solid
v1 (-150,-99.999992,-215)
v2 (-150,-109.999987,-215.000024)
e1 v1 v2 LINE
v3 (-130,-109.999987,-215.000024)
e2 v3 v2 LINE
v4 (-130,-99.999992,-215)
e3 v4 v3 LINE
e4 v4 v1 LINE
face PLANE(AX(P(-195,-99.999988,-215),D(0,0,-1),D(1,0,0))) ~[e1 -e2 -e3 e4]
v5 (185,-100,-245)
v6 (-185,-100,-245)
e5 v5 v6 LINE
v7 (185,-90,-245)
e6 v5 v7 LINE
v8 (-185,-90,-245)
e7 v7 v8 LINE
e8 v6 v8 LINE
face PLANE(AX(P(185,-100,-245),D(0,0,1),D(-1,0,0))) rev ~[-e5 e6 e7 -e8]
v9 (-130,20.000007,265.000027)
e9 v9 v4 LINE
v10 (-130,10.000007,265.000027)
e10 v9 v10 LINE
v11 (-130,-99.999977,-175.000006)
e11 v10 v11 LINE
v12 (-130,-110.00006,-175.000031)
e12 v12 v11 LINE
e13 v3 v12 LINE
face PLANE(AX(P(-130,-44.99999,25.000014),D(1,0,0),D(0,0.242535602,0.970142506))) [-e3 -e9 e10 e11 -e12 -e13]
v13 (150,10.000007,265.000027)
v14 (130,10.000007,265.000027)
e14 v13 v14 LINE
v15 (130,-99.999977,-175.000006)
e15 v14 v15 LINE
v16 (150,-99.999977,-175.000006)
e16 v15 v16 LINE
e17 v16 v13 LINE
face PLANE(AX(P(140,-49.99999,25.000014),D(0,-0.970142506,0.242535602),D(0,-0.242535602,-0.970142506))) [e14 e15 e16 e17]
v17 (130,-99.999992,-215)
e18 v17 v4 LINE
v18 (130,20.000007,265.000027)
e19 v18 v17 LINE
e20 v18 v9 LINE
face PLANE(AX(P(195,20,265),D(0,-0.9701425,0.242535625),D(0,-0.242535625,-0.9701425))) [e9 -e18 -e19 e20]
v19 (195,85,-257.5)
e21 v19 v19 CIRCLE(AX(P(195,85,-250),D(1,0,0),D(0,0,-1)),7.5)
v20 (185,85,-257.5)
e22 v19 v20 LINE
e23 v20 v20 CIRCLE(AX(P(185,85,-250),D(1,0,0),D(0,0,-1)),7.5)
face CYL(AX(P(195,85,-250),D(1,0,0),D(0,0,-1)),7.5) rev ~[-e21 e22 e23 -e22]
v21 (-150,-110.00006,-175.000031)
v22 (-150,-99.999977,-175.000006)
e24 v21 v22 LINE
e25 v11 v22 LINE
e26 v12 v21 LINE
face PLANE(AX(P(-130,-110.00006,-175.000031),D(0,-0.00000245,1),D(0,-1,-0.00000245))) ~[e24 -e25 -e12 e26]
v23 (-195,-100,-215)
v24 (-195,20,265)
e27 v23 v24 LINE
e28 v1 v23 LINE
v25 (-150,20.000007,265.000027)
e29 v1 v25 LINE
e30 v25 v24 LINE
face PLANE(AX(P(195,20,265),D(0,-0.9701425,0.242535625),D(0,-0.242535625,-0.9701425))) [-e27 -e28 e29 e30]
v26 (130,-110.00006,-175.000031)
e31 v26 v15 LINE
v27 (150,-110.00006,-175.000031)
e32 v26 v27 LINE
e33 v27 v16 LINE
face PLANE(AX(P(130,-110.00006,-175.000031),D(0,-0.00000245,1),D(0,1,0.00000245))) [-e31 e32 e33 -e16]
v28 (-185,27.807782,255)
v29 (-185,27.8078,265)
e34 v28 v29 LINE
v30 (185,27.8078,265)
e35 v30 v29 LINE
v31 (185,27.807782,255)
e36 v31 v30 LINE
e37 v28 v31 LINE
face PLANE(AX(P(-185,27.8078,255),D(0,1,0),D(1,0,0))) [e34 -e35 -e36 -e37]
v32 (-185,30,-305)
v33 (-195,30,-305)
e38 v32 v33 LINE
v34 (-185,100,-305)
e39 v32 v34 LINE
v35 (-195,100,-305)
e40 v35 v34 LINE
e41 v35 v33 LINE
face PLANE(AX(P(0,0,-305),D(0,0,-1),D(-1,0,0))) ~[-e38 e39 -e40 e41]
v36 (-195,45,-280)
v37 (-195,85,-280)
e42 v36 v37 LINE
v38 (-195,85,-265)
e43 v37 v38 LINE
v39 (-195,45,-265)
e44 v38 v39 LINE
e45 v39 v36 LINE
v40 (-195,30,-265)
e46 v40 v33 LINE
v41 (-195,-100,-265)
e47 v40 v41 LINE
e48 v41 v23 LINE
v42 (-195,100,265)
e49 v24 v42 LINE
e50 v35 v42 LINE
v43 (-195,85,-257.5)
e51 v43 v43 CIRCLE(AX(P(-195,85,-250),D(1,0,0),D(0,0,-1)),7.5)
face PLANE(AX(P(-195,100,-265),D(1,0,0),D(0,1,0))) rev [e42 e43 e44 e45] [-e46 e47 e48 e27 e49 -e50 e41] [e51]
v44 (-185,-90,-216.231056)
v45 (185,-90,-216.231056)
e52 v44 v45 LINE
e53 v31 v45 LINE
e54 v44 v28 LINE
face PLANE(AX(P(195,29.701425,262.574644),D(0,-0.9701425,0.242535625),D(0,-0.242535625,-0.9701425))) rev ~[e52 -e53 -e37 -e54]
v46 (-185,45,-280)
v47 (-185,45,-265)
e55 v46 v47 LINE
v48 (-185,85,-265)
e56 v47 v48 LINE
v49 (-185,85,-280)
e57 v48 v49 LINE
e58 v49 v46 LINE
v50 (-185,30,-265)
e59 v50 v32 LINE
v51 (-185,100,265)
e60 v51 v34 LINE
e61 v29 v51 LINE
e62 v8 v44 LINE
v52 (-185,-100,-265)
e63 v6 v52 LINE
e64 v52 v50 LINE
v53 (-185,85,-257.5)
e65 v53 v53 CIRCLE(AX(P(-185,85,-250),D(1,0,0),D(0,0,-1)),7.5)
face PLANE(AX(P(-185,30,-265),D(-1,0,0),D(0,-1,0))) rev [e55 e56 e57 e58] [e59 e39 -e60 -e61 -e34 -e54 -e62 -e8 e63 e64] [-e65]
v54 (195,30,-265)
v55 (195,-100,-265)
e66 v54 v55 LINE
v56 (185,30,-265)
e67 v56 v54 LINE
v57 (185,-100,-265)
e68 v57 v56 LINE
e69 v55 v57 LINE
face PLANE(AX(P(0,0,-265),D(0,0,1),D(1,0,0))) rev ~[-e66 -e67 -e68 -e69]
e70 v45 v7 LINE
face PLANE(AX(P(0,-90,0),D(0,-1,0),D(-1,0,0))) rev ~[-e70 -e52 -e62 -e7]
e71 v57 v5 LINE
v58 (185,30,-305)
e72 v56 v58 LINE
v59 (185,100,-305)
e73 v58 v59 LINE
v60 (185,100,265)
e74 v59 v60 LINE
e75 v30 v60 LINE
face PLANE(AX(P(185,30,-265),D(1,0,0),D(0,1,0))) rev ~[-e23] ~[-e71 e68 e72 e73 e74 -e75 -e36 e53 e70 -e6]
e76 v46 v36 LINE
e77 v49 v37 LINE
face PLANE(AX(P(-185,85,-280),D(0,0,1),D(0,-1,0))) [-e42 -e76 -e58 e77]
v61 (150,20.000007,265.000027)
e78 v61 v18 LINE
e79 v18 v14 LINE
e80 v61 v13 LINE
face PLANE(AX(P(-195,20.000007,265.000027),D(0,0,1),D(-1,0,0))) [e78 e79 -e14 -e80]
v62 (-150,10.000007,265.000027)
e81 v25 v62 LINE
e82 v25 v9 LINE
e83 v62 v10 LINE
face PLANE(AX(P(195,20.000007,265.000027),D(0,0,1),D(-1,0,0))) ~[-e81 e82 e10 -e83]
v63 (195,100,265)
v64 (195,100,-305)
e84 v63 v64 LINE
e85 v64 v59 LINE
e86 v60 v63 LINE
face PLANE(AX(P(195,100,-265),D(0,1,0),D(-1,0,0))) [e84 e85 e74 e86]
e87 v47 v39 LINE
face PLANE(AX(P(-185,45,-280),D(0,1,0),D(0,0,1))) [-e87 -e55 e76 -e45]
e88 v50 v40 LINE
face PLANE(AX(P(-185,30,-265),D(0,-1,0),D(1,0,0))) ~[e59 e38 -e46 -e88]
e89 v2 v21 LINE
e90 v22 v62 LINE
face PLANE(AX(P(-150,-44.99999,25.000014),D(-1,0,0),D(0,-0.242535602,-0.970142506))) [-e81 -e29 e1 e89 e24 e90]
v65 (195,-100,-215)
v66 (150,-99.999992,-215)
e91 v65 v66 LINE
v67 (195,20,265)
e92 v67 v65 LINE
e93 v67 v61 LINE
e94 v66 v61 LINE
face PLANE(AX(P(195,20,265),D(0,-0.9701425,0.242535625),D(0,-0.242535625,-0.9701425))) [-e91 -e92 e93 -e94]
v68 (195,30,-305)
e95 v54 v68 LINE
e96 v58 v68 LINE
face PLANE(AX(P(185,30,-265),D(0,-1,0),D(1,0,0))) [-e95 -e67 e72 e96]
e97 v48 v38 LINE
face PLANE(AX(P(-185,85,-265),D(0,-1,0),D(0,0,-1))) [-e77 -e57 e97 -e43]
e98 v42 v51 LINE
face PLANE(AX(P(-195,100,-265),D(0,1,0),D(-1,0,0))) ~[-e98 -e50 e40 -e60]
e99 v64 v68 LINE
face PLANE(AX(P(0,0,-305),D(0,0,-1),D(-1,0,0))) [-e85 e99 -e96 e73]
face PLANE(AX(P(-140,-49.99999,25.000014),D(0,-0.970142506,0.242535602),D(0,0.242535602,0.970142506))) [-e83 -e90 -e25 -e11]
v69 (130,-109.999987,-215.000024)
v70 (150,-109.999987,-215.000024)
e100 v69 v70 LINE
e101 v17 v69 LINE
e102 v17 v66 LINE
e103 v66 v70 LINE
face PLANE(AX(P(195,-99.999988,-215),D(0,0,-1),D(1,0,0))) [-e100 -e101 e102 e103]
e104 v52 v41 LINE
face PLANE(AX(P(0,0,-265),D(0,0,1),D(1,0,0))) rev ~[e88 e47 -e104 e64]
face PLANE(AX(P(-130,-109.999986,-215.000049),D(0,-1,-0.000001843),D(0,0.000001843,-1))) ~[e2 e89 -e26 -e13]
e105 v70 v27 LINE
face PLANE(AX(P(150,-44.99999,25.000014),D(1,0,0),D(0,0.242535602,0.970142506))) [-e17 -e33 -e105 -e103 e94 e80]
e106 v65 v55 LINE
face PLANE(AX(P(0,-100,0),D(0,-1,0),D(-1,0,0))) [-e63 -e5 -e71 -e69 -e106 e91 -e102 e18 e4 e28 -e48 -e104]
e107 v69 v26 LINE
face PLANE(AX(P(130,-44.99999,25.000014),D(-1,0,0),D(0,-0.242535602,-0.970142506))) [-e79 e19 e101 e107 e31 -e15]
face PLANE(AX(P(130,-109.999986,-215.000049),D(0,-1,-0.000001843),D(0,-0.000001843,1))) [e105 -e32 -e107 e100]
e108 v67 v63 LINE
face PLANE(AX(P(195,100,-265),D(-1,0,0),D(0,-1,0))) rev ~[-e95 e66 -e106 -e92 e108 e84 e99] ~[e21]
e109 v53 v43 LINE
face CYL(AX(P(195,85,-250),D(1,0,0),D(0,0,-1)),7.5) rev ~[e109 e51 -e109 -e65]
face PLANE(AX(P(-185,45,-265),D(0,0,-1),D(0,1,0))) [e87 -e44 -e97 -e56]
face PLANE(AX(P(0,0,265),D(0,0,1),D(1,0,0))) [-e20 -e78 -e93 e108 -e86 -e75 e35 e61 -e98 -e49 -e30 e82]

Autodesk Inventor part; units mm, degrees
ref_plane "YZ Plane" through (0, 0, 0) normal (1, 0, 0) x (0, 1, 0)
ref_plane "XZ Plane" through (0, 0, 0) normal (0, 1, 0) x (-1, 0, 0)
ref_plane "XY Plane" through (0, 0, 0) normal (0, 0, 1) x (1, 0, 0)
sketch "草图1" plane through (0, 0, 0) normal (0, 0, 1) x (1, 0, 0)
  line L0 (-195, 100) -> (195, 100)
  line L1 (195, 100) -> (195, -100)
  line L2 (195, -100) -> (-195, -100)
  line L3 (-195, -100) -> (-195, 100)
  line L4 (-273, 0) -> (273, 0) projected
  line L5 (0, -140) -> (0, 140) projected
  point P0 (0, 0)
  dimension "d0" = 390
  dimension "d1" = 200
extrude "拉伸1" add sketch "草图1" along normal mid plane 530
sketch "草图2" plane through (195, -100, 265) normal (1, 0, 0) x (0, 0, -1)
  line L0 (0, 200) -> (0, 0) projected
  line L1 (0, 0) -> (0, 120)
  line L2 (0, 120) -> (480, 0)
  line L3 (530, 0) -> (0, 0) projected
  line L4 (480, 0) -> (0, 0)
  point P0 (265, 100)
  dimension "d4" = 120
  dimension "d5" = 480
extrude "拉伸2" cut sketch "草图2" against normal through all
shell "抽壳1" thickness 10 removed faces 1 at (-65, 100, 88.3333)
sketch "草图3" plane through (-195, -100, -265) normal (0, -1, 0) x (1, 0, 0)
  line L0 (390, 0) -> (0, 0) projected
  line L1 (10, 0) -> (380, 0)
  line L2 (380, 0) -> (380, 20)
  line L3 (380, 20) -> (10, 20)
  line L4 (10, 20) -> (10, 0)
  line L5 (195, -106) -> (195, 636) projected
  line L6 (0, 0) -> (0, 50) projected
  point P0 (195, 265)
  point P1 (10, 10)
  dimension "d9" = 20
  dimension "d28" = 10
extrude "拉伸3" cut sketch "草图3" against normal through all
sketch "草图4" plane through (195, -100, -265) normal (1, 0, 0) x (0, 0, -1)
  circle A0 centre (-15, 185) radius 7.5
  line L0 (-530, 200) -> (0, 200) projected
  line L1 (0, 200) -> (0, 0) projected
  point P0 (-265, 100)
  dimension "d13" = 15
  dimension "d14" = 15
  dimension "d15" = 15
extrude "拉伸4" cut sketch "草图4" against normal through all
sketch "草图6" plane through (185, 27.8078, 255) normal (0, 0, -1) x (-1, 0, 0)
  line L0 (370, 0) -> (0, 0) projected
  line L1 (370, 72.1922) -> (370, 0) projected
  line L2 (0, 0) -> (370, 0)
  line L3 (370, 0) -> (370, 75)
  line L4 (370, 75) -> (0, 75)
  line L5 (0, 75) -> (0, 0)
  point P0 (185, -27.8078)
  dimension "d24" = 75
extrude "拉伸6" cut sketch "草图6" against normal through all
sketch "草图10" plane through (-195, -100, -215) normal (0, -0.9701425, 0.2425356) x (1, 0, 0)
  line L0 (0, 494.7727) -> (390, 494.7727) projected
  line L1 (390, 0) -> (0, 0) projected
  line L2 (345, 494.7727) -> (325, 494.7727)
  line L3 (325, 494.7727) -> (325, 0)
  line L4 (325, 0) -> (345, 0)
  line L5 (345, 0) -> (345, 494.7727)
  line L6 (390, 494.7727) -> (390, -48.5071) projected
  point P0 (195, 232.8342)
  point P1 (345, 0)
  dimension "d46" = 20
  dimension "d47" = 45
sketch "草图11" plane through (0, 0, 265) normal (0, 0, 1) x (1, 0, 0)
  line L0 (-195, 20) -> (195, 20) projected
  line L1 (150, 20) -> (150, 10)
  line L2 (150, -100) -> (150, 20) projected
  point P0 (0, 0)
  dimension "d50" = 10
sweep "扫掠1" add profiles "草图10" path "草图11" path curves L1 contours L0 L5 L1 L3
sketch "草图14" plane through (130, -100, -215) normal (-1, 0, 0) x (0, 0.2425356, 0.9701425)
  line L0 (-48.5071, 12.1268) -> (0, 0) projected
  line L1 (0, 0) -> (-2.4254, -9.7014)
  line L2 (-2.4254, -9.7014) -> (36.3803, -19.4029)
  line L3 (36.3803, -19.4029) -> (38.8057, -9.7014)
  line L4 (0, 0) -> (494.7727, 0) projected
  line L5 (38.8057, -9.7014) -> (0, 0)
  line L6 (0, 0) -> (-2.4254, -9.7014) projected
  point P0 (232.8342, 44.8691)
  dimension "d54" = 40
extrude "拉伸11" add sketch "草图14" against normal blind 20
sketch "草图15" plane through (0, 0, -265) normal (0, 0, -1) x (-1, 0, 0)
  line L0 (-195, 100) -> (-195, -100) projected
  line L1 (-185, -100) -> (-185, 100) projected
  line L2 (-195, 100) -> (-185, 100)
  line L3 (-185, 100) -> (-185, 30)
  line L4 (-185, 30) -> (-195, 30)
  line L5 (-195, 30) -> (-195, 100)
  point P0 (0, 0)
  point P1 (-195, 30)
  dimension "d57" = 70
extrude "拉伸12" add sketch "草图15" along normal blind 40
mirror "镜像3" about plane through (0, 0, 0) normal (1, 0, 0) of "扫掠1", "拉伸11"
mirror "镜像4" about plane through (0, 0, 0) normal (1, 0, 0) of "拉伸12"
sketch "草图5" plane through (-185, -100, -265) normal (1, 0, 0) x (0, 0, -1)
  line L0 (0, 185) -> (15, 185)
  line L1 (15, 185) -> (15, 145)
  line L2 (15, 145) -> (0, 145)
  line L3 (0, 145) -> (0, 185)
  circle A0 centre (-15, 185) radius 7.5 projected
  point P0 (-265, 100)
  dimension "d18" = 15
  dimension "d19" = 40
  dimension "d21" = 0
  dimension "d60" = 15
extrude "拉伸5" cut sketch "草图5" against normal through all contours L0 L1 L2 L3
properties part number "猫砂盆"
